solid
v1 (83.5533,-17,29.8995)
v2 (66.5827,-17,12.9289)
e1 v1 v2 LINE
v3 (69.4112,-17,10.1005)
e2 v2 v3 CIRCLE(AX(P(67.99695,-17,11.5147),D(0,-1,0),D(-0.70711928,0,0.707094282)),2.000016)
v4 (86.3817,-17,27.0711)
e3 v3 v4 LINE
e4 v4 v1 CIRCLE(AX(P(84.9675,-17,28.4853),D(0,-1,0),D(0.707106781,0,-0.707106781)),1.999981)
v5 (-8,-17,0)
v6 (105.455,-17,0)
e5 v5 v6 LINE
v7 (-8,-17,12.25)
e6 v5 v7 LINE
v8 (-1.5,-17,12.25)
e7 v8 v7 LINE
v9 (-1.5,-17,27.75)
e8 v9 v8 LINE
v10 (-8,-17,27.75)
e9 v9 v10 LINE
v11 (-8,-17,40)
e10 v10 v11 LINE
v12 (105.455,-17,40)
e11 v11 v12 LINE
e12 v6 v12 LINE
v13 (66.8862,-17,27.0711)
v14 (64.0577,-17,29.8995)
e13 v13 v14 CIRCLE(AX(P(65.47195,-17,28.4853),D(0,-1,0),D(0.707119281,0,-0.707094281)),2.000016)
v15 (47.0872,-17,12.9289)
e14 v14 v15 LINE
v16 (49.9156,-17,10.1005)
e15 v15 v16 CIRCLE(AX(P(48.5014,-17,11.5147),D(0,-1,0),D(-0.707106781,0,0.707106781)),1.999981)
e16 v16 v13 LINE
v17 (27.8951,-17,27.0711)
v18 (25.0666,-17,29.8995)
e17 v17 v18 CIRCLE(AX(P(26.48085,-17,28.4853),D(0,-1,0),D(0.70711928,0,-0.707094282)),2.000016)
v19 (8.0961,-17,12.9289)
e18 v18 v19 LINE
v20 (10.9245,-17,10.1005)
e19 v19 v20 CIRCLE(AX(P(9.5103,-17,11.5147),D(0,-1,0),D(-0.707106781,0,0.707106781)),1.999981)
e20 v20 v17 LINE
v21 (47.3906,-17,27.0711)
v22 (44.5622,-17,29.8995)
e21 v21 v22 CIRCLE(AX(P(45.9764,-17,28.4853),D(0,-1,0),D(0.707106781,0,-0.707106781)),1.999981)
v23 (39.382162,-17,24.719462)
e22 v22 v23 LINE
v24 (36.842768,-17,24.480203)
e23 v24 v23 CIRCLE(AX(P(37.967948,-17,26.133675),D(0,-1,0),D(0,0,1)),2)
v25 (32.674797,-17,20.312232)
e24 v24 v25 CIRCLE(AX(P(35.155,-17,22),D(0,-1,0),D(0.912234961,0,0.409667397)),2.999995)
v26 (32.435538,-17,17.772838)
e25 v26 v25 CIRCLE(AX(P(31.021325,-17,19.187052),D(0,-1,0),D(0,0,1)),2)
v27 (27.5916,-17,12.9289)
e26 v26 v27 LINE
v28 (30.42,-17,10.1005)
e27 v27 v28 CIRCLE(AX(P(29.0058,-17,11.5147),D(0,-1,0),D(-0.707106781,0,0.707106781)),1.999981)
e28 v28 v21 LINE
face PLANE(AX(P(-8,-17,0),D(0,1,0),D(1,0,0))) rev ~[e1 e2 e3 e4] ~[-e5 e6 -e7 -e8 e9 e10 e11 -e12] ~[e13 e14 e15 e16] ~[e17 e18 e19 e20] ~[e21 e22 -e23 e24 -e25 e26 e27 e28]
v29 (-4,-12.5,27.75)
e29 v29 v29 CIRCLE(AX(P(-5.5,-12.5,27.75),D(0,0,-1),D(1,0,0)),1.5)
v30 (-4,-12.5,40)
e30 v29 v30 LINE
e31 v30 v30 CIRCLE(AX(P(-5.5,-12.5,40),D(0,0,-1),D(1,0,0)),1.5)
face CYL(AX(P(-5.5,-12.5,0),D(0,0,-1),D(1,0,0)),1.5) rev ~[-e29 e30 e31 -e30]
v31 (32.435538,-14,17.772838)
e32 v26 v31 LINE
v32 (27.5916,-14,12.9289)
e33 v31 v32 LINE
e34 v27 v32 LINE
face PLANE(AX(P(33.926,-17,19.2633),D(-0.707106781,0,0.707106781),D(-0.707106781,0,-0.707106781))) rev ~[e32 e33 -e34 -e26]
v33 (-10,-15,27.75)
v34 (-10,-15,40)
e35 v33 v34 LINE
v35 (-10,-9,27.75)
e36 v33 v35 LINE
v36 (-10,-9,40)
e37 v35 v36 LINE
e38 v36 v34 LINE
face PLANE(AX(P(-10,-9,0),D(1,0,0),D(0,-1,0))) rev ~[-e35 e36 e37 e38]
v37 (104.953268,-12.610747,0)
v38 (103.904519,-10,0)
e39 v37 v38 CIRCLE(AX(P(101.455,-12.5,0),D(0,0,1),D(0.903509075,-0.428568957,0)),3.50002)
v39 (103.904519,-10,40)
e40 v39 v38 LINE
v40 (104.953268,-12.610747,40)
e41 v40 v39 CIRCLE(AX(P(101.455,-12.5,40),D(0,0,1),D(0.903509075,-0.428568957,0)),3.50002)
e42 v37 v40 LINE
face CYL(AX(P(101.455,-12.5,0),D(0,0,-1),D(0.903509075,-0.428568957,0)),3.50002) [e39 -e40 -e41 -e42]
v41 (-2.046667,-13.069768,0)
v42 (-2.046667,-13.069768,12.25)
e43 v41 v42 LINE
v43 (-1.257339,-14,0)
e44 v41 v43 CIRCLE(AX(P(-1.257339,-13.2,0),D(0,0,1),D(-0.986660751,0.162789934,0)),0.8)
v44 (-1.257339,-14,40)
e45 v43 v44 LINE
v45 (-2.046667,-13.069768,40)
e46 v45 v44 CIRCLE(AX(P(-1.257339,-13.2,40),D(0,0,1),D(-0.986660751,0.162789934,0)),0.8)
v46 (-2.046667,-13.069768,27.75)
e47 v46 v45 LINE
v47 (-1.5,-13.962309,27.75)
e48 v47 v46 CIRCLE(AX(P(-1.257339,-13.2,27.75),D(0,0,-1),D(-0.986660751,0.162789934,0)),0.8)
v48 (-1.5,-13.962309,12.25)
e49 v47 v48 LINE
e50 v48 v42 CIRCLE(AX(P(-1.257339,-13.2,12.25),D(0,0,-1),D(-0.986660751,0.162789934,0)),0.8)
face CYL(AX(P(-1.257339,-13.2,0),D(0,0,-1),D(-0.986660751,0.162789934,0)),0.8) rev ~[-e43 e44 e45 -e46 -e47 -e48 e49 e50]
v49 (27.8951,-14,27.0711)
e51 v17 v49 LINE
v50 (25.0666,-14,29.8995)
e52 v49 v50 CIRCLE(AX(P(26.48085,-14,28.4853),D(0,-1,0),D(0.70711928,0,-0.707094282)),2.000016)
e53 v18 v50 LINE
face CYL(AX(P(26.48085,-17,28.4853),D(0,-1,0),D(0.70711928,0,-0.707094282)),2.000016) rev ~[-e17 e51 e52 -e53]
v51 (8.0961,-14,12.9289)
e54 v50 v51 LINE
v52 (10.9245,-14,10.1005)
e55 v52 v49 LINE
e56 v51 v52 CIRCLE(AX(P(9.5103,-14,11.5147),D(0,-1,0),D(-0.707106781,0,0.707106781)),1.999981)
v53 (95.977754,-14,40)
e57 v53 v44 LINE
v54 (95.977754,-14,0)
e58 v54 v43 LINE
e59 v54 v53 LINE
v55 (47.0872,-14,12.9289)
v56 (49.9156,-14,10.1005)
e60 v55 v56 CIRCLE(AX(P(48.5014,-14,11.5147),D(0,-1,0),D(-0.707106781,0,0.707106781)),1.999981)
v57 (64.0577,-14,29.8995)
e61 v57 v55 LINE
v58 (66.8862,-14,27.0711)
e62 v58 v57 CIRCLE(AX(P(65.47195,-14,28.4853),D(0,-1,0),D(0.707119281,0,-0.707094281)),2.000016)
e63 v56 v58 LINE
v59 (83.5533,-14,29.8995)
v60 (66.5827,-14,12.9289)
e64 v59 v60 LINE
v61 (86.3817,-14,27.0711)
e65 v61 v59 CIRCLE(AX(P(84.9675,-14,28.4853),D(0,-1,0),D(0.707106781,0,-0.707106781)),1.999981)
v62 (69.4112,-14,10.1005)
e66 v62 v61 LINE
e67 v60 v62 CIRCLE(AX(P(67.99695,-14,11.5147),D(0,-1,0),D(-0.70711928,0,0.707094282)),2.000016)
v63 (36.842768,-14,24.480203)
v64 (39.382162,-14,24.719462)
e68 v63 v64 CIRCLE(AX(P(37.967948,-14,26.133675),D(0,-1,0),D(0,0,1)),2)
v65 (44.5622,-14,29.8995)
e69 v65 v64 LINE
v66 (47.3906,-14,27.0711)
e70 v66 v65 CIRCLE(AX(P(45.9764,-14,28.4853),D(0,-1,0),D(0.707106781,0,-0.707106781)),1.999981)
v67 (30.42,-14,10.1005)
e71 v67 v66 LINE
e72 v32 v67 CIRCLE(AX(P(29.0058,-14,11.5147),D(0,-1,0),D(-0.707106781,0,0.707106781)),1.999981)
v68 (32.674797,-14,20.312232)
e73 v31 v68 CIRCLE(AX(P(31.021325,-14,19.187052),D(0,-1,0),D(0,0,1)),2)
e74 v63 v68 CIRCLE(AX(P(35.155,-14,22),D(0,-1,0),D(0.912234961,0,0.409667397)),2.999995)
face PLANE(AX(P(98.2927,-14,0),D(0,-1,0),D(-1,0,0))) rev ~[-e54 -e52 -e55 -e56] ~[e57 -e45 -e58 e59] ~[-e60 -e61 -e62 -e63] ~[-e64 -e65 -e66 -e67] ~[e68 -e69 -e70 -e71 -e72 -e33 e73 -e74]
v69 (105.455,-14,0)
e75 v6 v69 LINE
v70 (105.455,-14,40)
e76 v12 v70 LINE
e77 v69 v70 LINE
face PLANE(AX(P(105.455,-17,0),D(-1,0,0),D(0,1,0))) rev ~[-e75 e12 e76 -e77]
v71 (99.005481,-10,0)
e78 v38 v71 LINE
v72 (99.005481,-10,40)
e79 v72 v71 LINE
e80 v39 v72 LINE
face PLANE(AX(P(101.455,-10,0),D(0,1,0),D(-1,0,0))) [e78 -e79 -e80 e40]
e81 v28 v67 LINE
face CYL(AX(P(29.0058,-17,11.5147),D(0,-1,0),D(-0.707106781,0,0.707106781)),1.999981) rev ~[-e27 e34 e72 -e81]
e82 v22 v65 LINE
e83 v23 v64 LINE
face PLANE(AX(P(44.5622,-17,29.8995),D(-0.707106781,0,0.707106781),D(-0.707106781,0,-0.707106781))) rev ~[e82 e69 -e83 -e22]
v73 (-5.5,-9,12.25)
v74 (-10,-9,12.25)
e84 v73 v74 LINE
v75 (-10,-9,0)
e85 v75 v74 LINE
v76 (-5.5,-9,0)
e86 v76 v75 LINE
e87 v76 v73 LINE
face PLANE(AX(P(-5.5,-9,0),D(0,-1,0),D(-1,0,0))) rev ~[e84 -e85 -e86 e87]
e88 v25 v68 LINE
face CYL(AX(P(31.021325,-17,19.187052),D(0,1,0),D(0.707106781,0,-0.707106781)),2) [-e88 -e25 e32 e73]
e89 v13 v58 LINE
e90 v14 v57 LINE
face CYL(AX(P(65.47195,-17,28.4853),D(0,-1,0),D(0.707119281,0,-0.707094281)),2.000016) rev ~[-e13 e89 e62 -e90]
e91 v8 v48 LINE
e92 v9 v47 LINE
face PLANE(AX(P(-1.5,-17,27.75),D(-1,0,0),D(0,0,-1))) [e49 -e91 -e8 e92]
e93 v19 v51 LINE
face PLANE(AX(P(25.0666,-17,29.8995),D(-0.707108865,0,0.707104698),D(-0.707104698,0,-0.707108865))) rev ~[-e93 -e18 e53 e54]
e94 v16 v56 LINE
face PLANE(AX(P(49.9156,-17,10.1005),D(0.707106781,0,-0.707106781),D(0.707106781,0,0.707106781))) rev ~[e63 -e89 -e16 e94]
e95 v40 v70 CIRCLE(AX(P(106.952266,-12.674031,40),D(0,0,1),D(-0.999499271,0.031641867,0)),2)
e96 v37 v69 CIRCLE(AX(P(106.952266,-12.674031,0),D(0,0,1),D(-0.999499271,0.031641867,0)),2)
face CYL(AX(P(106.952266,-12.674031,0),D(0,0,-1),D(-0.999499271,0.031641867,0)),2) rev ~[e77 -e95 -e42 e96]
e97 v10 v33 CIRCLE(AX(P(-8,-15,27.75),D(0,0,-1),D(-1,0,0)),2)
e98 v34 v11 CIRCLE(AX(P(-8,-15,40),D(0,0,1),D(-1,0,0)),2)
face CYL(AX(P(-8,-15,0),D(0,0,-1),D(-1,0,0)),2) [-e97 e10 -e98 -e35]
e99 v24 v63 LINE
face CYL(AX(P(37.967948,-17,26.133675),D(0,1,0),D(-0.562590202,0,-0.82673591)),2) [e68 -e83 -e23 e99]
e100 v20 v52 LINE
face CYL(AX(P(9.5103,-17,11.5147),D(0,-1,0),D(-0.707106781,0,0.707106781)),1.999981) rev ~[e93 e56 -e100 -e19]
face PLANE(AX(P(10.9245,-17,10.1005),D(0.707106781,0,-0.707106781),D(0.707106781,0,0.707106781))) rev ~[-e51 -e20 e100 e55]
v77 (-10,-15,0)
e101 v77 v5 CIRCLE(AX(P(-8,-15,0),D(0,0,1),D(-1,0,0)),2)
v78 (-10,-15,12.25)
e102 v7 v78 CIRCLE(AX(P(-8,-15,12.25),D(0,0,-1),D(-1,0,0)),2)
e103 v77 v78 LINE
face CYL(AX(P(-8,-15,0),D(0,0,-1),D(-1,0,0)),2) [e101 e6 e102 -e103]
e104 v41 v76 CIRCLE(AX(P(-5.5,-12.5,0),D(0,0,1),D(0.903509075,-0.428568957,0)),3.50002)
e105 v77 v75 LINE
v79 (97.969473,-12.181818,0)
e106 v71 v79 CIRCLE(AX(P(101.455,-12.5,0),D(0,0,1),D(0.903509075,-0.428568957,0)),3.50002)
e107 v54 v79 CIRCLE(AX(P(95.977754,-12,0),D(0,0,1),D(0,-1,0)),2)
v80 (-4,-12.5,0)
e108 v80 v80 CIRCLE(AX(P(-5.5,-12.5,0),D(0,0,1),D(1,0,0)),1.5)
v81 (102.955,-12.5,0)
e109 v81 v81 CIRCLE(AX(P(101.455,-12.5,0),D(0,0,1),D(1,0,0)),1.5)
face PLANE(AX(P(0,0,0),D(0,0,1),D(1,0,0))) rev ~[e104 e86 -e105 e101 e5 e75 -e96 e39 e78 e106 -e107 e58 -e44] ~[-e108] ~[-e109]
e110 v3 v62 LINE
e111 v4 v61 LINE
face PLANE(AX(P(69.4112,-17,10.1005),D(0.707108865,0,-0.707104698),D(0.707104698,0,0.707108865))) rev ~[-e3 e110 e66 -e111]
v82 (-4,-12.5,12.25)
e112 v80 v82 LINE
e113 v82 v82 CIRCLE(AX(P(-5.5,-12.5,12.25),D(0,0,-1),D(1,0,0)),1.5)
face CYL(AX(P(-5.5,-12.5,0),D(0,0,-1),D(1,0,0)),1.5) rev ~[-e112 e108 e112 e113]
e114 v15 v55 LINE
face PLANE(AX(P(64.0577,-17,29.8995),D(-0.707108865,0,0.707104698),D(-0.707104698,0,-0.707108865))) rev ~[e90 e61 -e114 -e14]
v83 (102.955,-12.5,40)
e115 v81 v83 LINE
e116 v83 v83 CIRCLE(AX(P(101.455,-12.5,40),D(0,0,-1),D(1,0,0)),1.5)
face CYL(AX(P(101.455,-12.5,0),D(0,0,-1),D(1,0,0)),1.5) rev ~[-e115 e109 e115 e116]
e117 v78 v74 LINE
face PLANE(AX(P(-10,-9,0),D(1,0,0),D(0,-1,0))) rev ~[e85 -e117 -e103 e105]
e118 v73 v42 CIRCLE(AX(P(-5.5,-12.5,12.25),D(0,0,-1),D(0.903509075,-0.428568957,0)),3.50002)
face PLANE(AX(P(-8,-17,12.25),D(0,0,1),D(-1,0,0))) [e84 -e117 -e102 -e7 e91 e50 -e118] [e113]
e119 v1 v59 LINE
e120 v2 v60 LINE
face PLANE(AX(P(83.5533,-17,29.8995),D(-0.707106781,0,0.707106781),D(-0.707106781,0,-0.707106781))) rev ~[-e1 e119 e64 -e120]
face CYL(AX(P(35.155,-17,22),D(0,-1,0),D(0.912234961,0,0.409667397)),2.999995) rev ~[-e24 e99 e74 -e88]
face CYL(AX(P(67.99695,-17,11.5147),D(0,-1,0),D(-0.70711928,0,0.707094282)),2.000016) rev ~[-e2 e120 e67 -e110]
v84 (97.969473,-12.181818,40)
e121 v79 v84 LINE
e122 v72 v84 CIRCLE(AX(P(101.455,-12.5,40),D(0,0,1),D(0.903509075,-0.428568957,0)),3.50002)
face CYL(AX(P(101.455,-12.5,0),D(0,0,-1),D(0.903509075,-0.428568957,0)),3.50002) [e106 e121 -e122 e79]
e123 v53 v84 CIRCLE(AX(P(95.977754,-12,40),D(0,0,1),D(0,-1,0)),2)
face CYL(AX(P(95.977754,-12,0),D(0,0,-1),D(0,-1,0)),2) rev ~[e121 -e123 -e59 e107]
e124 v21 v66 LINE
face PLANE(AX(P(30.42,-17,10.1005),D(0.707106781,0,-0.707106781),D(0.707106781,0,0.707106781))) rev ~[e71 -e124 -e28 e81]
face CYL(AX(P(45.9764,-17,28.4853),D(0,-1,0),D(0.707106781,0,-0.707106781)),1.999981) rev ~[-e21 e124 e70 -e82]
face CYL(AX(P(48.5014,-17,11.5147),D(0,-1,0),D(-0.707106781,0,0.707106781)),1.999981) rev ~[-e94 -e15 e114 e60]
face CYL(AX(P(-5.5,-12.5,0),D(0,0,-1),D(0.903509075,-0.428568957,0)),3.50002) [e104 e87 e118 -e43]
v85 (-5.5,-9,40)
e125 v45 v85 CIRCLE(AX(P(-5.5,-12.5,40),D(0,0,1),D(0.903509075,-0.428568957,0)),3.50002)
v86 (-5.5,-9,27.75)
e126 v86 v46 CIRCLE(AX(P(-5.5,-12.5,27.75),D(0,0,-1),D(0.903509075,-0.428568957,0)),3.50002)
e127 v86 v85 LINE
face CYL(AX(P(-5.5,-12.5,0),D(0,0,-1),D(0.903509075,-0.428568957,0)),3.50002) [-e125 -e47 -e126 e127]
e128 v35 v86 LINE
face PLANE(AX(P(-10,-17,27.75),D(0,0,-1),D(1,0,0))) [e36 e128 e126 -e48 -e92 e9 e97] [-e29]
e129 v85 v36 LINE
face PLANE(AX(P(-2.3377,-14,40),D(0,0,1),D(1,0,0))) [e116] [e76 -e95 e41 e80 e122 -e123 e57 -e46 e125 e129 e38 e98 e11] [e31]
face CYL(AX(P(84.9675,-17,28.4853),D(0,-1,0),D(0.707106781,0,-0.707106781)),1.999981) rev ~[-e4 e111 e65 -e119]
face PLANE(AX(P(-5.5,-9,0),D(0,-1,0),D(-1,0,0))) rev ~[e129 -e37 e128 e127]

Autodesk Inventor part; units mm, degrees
ref_plane "YZ Plane" through (0, 0, 0) normal (1, 0, 0) x (0, 1, 0)
ref_plane "XZ Plane" through (0, 0, 0) normal (0, 1, 0) x (-1, 0, 0)
sketch "Szkic1" plane through (0, 0, 0) normal (0, 0, 1) x (1, 0, 0)
  circle A0 centre (-5.5, -12.5) radius 1.5
  circle A1 centre (-5.5, 53.1646) radius 1.5
  circle A2 centre (101.455, -12.5) radius 1.5
  arc A3 (-10, -15) -> (-8, -17) centre (-8, -15) ccw
  line L0 (-8, -17) -> (136.455, -17)
  arc A4 (136.455, -17) -> (141.455, -12) centre (136.455, -12) ccw
  line L1 (141.455, -12) -> (141.455, -2)
  arc A5 (141.455, -2) -> (136.455, 3) centre (136.455, -2) ccw
  line L2 (136.455, 3) -> (127.455, 3)
  arc A6 (115.455, 15) -> (127.455, 3) centre (127.455, 15) ccw
  line L3 (115.455, 15) -> (115.455, 29.1646)
  arc A7 (127.455, 41.1646) -> (115.455, 29.1646) centre (127.455, 29.1646) ccw
  line L4 (127.455, 41.1646) -> (136.455, 41.1646)
  arc A8 (136.455, 41.1646) -> (141.455, 46.1646) centre (136.455, 46.1646) ccw
  line L5 (141.455, 46.1646) -> (141.455, 56.1646)
  arc A9 (141.455, 56.1646) -> (136.455, 61.1646) centre (136.455, 56.1646) ccw
  line L6 (136.455, 61.1646) -> (122.455, 61.1646)
  line L7 (107.455, 76.1646) -> (122.455, 61.1646)
  line L8 (107.455, 76.1646) -> (107.455, 88.1646)
  arc A10 (107.455, 88.1646) -> (102.455, 93.1646) centre (102.455, 88.1646) ccw
  line L9 (102.455, 93.1646) -> (92.455, 93.1646)
  arc A11 (92.455, 93.1646) -> (87.455, 88.1646) centre (92.455, 88.1646) ccw
  line L10 (87.455, 88.1646) -> (87.455, 79.1646)
  arc A12 (75.455, 67.1646) -> (87.455, 79.1646) centre (75.455, 79.1646) ccw
  line L11 (75.455, 67.1646) -> (22, 67.1646)
  arc A13 (10, 79.1646) -> (22, 67.1646) centre (22, 79.1646) ccw
  line L12 (10, 79.1646) -> (10, 88.1646)
  arc A14 (10, 88.1646) -> (5, 93.1646) centre (5, 88.1646) ccw
  line L13 (5, 93.1646) -> (-5, 93.1646)
  arc A15 (-5, 93.1646) -> (-10, 88.1646) centre (-5, 88.1646) ccw
  line L14 (-10, 88.1646) -> (-10, -15)
  circle A16 centre (97.455, 83.1646) radius 2
  circle A17 centre (131.455, -7) radius 2
  circle A18 centre (131.455, 51.1646) radius 2
  circle A19 centre (0, 83.1646) radius 2
  line L15 (89.5711, 35.5361) -> (89.5711, 17.5361)
  arc A20 (83.5711, 11.5361) -> (89.5711, 17.5361) centre (83.5711, 17.5361) ccw
  line L16 (83.5711, 11.5361) -> (78.5711, 11.5361)
  arc A21 (72.5711, 17.5361) -> (78.5711, 11.5361) centre (78.5711, 17.5361) ccw
  line L17 (72.5711, 17.5361) -> (72.5711, 35.5361)
  arc A22 (78.5711, 41.5361) -> (72.5711, 35.5361) centre (78.5711, 35.5361) ccw
  line L18 (78.5711, 41.5361) -> (83.5711, 41.5361)
  arc A23 (89.5711, 35.5361) -> (83.5711, 41.5361) centre (83.5711, 35.5361) ccw
  line L19 (107.455, 22.1646) -> (107.455, 25.6646)
  line L20 (107.455, 25.6646) -> (109.455, 25.6646)
  line L21 (109.455, 25.6646) -> (109.455, 22.1646)
  line L22 (109.455, 22.1646) -> (107.455, 22.1646)
  line L23 (82.5, 60.1646) -> (86, 60.1646)
  line L24 (86, 60.1646) -> (86, 58.1646)
  line L25 (86, 58.1646) -> (82.5, 58.1646)
  line L26 (82.5, 58.1646) -> (82.5, 60.1646)
  line L27 (53.5, 60.1646) -> (57, 60.1646)
  line L28 (57, 60.1646) -> (57, 58.1646)
  line L29 (57, 58.1646) -> (53.5, 58.1646)
  line L30 (53.5, 58.1646) -> (53.5, 60.1646)
  line L31 (24.5, 60.1646) -> (28, 60.1646)
  line L32 (28, 60.1646) -> (28, 58.1646)
  line L33 (28, 58.1646) -> (24.5, 58.1646)
  line L34 (24.5, 58.1646) -> (24.5, 60.1646)
  line L35 (10, 58.1646) -> (10, 60.1646)
  line L36 (10, 60.1646) -> (13.5, 60.1646)
  line L37 (13.5, 60.1646) -> (13.5, 58.1646)
  line L38 (13.5, 58.1646) -> (10, 58.1646)
  line L39 (39, 60.1646) -> (42.5, 60.1646)
  line L40 (42.5, 60.1646) -> (42.5, 58.1646)
  line L41 (42.5, 58.1646) -> (39, 58.1646)
  line L42 (39, 58.1646) -> (39, 60.1646)
  line L43 (68, 60.1646) -> (71.5, 60.1646)
  line L44 (71.5, 60.1646) -> (71.5, 58.1646)
  line L45 (71.5, 58.1646) -> (68, 58.1646)
  line L46 (68, 58.1646) -> (68, 60.1646)
  line L47 (107.455, 37.6646) -> (107.455, 41.1646)
  line L48 (107.455, 41.1646) -> (109.455, 41.1646)
  line L49 (109.455, 41.1646) -> (109.455, 37.6646)
  line L50 (109.455, 37.6646) -> (107.455, 37.6646)
  line L51 (107.455, 6.6646) -> (107.455, 10.1646)
  line L52 (107.455, 10.1646) -> (109.455, 10.1646)
  line L53 (109.455, 10.1646) -> (109.455, 6.6646)
  line L54 (109.455, 6.6646) -> (107.455, 6.6646)
  line L55 (54.7961, 40.5361) -> (54.7961, 12.5361)
  arc A24 (48.7961, 6.5361) -> (54.7961, 12.5361) centre (48.7961, 12.5361) ccw
  line L56 (48.7961, 6.5361) -> (30.7961, 6.5361)
  arc A25 (24.7961, 12.5361) -> (30.7961, 6.5361) centre (30.7961, 12.5361) ccw
  line L57 (24.7961, 12.5361) -> (24.7961, 40.5361)
  arc A26 (30.7961, 46.5361) -> (24.7961, 40.5361) centre (30.7961, 40.5361) ccw
  line L58 (30.7961, 46.5361) -> (48.7961, 46.5361)
  arc A27 (54.7961, 40.5361) -> (48.7961, 46.5361) centre (48.7961, 40.5361) ccw
  circle A28 centre (65.8311, 7.4861) radius 1.6
  circle A29 centre (15.0311, 50.6661) radius 1.6
  circle A30 centre (89.9611, 50.6661) radius 1.6
  circle A31 centre (13.7611, 2.4061) radius 1.6
  circle A32 centre (65.8311, 35.4261) radius 1.6
  circle A33 centre (96.3111, 2.4061) radius 1.6
  line L59 (105.455, -17) -> (105.455, -14)
  line L60 (105.455, -14) -> (-10, -14)
  arc A34 (-2.3377, -14) -> (-8.6623, -14) centre (-5.5, -12.5) ccw
  arc A35 (104.6173, -14) -> (98.2927, -14) centre (101.455, -12.5) ccw
  line L61 (-5.5, -9) -> (-10, -9)
  point P0 (0, 0)
  point P1 (0, 0)
  dimension "d0" = 3
  dimension "d1" = 36
  dimension "d2" = 7
  dimension "d3" = 7
extrude "Wyciągnięcie proste1" add sketch "Szkic1" along normal blind 40 contours L60 A34 | L60 L59 L0 A3 L14 | L60 L14 L61 A34 | A35 L60
fillet "Zaokrąglenie1" radius 2 2 edges at (98.2927, -14, 20) (104.6173, -14, 20)
fillet "Zaokrąglenie1" radius 0.8 1 edges at (-2.3377, -14, 20)
sketch "Szkic2" plane through (-8, -17, 0) normal (0, -1, 0) x (1, 0, 0)
  line L0 (0, 0) -> (113.455, 0) projected
  line L1 (113.455, 0) -> (113.455, 40) projected
  line L2 (0, 40) -> (113.455, 40) projected
  line L3 (0, 0) -> (0, 40) projected
  line L4 (-2, 0) -> (-2, 40) projected
  line L5 (-2, 0) -> (-2, 40) projected
  line L6 (-2, 27.75) -> (6.5, 27.75)
  line L7 (6.5, 27.75) -> (6.5, 12.25)
  line L8 (6.5, 12.25) -> (-2, 12.25)
  line L9 (-2, 12.25) -> (-2, 27.75)
  point P0 (8, 0)
  dimension "d7" = 8.5
  dimension "d8" = 15.5
  dimension "d9" = 40
  dimension "d10" = 12.25
extrude "Wyciągnięcie proste2" cut sketch "Szkic2" against normal through all contours L8 L4 L6 L3 | L3 L6 L7 L8
sketch "Szkic3" plane through (-8, -17, 0) normal (0, -1, 0) x (1, 0, 0)
  line L0 (6.5, 12.25) -> (0, 12.25) projected
  line L1 (0, 0) -> (0, 12.25) projected
  line L2 (0, 0) -> (113.455, 0) projected
  line L3 (113.455, 0) -> (113.455, 40) projected
  line L4 (0, 40) -> (113.455, 40) projected
  line L5 (0, 27.75) -> (0, 40) projected
  line L6 (0, 27.75) -> (6.5, 27.75) projected
  line L7 (6.5, 27.75) -> (6.5, 12.25) projected
  line L8 (103.9778, 0) -> (103.9778, 40) projected
  line L9 (17.5103, 11.5147) -> (34.4808, 28.4853) construction
  line L10 (18.9245, 10.1005) -> (35.8951, 27.0711)
  line L11 (33.0666, 29.8995) -> (16.0961, 12.9289)
  arc A0 (16.0961, 12.9289) -> (18.9245, 10.1005) centre (17.5103, 11.5147) ccw
  arc A1 (35.8951, 27.0711) -> (33.0666, 29.8995) centre (34.4808, 28.4853) ccw
  line L12 (25.9956, 20) -> (49.9956, 20) construction
  line L13 (37.0058, 11.5147) -> (53.9764, 28.4853) construction
  line L14 (38.42, 10.1005) -> (55.3906, 27.0711)
  line L15 (52.5622, 29.8995) -> (35.5916, 12.9289)
  arc A2 (35.5916, 12.9289) -> (38.42, 10.1005) centre (37.0058, 11.5147) ccw
  arc A3 (55.3906, 27.0711) -> (52.5622, 29.8995) centre (53.9764, 28.4853) ccw
  line L16 (45.4911, 20) -> (69.4911, 20) construction
  line L17 (56.5014, 11.5147) -> (73.472, 28.4853) construction
  line L18 (57.9156, 10.1005) -> (74.8862, 27.0711)
  line L19 (72.0577, 29.8995) -> (55.0872, 12.9289)
  arc A4 (55.0872, 12.9289) -> (57.9156, 10.1005) centre (56.5014, 11.5147) ccw
  arc A5 (74.8862, 27.0711) -> (72.0577, 29.8995) centre (73.472, 28.4853) ccw
  line L20 (64.9867, 20) -> (88.9867, 20) construction
  line L21 (75.997, 11.5147) -> (92.9675, 28.4853) construction
  line L22 (77.4112, 10.1005) -> (94.3817, 27.0711)
  line L23 (91.5533, 29.8995) -> (74.5827, 12.9289)
  arc A6 (74.5827, 12.9289) -> (77.4112, 10.1005) centre (75.997, 11.5147) ccw
  arc A7 (94.3817, 27.0711) -> (91.5533, 29.8995) centre (92.9675, 28.4853) ccw
  line L24 (84.4822, 20) -> (108.4822, 20) construction
  arc A8 (45.8917, 23.229) -> (41.926, 19.2633) centre (43.155, 22) ccw
  point P0 (8, 0)
  dimension "d13" = 40
  dimension "d14" = 20
  dimension "d15" = 20
  dimension "d16" = 20
  dimension "d17" = 20
  dimension "d19" = 97.4778
  dimension "d20" = 19.4956
  dimension "d21" = 19.4956
  dimension "d22" = 19.4956
  dimension "d23" = 19.4956
  dimension "d24" = 12
  dimension "d25" = 45
  dimension "d26" = 4
  dimension "d27" = 12
  dimension "d28" = 45
  dimension "d29" = 4
  dimension "d30" = 12
  dimension "d31" = 45
  dimension "d32" = 4
  dimension "d33" = 12
  dimension "d34" = 45
  dimension "d35" = 4
  dimension "d38" = 18
  dimension "d39" = 70.3
  dimension "d40" = 6
extrude "Wyciągnięcie proste3" cut sketch "Szkic3" against normal through all contours A0 L11 A1 L10 | A2 L15 A3 L14 | A8 L15 | A4 L19 A5 L18 | A6 L23 A7 L22
fillet "Zaokrąglenie2" radius 2 2 edges at (33.926, -15.5, 19.2633) (37.8917, -15.5, 23.229)
ref_plane "Płaszczyzna konstrukcyjna1" through (101.455, -9, 0) normal (0, 1, 0) x (-1, 0, 0)
sketch "Szkic4" plane through (101.455, -9, 0) normal (0, 1, 0) x (-1, 0, 0)
  line L0 (16.8478, 48.5064) -> (-17.7331, 48.5064)
  line L1 (-17.7331, 48.5064) -> (-17.7331, -24.0755)
  line L2 (-17.7331, -24.0755) -> (16.8478, -24.0755)
  line L3 (16.8478, -24.0755) -> (16.8478, 48.5064)
  point P0 (101.455, 0)
extrude "Wyciągnięcie proste4" cut sketch "Szkic4" against normal blind 1
equation "\"d10\" = -0.5 * d8 + 0.5 * d9"
equation "\"d16\" = d15"
equation "\"d17\" = d15"
equation "\"d20\" = 0.2 * d19"
equation "\"d21\" = d20"
equation "\"d22\" = d20"
equation "\"d23\" = d20"
properties part number "3DP_PLA_Controller_Case_Side_Wall_Longer"
